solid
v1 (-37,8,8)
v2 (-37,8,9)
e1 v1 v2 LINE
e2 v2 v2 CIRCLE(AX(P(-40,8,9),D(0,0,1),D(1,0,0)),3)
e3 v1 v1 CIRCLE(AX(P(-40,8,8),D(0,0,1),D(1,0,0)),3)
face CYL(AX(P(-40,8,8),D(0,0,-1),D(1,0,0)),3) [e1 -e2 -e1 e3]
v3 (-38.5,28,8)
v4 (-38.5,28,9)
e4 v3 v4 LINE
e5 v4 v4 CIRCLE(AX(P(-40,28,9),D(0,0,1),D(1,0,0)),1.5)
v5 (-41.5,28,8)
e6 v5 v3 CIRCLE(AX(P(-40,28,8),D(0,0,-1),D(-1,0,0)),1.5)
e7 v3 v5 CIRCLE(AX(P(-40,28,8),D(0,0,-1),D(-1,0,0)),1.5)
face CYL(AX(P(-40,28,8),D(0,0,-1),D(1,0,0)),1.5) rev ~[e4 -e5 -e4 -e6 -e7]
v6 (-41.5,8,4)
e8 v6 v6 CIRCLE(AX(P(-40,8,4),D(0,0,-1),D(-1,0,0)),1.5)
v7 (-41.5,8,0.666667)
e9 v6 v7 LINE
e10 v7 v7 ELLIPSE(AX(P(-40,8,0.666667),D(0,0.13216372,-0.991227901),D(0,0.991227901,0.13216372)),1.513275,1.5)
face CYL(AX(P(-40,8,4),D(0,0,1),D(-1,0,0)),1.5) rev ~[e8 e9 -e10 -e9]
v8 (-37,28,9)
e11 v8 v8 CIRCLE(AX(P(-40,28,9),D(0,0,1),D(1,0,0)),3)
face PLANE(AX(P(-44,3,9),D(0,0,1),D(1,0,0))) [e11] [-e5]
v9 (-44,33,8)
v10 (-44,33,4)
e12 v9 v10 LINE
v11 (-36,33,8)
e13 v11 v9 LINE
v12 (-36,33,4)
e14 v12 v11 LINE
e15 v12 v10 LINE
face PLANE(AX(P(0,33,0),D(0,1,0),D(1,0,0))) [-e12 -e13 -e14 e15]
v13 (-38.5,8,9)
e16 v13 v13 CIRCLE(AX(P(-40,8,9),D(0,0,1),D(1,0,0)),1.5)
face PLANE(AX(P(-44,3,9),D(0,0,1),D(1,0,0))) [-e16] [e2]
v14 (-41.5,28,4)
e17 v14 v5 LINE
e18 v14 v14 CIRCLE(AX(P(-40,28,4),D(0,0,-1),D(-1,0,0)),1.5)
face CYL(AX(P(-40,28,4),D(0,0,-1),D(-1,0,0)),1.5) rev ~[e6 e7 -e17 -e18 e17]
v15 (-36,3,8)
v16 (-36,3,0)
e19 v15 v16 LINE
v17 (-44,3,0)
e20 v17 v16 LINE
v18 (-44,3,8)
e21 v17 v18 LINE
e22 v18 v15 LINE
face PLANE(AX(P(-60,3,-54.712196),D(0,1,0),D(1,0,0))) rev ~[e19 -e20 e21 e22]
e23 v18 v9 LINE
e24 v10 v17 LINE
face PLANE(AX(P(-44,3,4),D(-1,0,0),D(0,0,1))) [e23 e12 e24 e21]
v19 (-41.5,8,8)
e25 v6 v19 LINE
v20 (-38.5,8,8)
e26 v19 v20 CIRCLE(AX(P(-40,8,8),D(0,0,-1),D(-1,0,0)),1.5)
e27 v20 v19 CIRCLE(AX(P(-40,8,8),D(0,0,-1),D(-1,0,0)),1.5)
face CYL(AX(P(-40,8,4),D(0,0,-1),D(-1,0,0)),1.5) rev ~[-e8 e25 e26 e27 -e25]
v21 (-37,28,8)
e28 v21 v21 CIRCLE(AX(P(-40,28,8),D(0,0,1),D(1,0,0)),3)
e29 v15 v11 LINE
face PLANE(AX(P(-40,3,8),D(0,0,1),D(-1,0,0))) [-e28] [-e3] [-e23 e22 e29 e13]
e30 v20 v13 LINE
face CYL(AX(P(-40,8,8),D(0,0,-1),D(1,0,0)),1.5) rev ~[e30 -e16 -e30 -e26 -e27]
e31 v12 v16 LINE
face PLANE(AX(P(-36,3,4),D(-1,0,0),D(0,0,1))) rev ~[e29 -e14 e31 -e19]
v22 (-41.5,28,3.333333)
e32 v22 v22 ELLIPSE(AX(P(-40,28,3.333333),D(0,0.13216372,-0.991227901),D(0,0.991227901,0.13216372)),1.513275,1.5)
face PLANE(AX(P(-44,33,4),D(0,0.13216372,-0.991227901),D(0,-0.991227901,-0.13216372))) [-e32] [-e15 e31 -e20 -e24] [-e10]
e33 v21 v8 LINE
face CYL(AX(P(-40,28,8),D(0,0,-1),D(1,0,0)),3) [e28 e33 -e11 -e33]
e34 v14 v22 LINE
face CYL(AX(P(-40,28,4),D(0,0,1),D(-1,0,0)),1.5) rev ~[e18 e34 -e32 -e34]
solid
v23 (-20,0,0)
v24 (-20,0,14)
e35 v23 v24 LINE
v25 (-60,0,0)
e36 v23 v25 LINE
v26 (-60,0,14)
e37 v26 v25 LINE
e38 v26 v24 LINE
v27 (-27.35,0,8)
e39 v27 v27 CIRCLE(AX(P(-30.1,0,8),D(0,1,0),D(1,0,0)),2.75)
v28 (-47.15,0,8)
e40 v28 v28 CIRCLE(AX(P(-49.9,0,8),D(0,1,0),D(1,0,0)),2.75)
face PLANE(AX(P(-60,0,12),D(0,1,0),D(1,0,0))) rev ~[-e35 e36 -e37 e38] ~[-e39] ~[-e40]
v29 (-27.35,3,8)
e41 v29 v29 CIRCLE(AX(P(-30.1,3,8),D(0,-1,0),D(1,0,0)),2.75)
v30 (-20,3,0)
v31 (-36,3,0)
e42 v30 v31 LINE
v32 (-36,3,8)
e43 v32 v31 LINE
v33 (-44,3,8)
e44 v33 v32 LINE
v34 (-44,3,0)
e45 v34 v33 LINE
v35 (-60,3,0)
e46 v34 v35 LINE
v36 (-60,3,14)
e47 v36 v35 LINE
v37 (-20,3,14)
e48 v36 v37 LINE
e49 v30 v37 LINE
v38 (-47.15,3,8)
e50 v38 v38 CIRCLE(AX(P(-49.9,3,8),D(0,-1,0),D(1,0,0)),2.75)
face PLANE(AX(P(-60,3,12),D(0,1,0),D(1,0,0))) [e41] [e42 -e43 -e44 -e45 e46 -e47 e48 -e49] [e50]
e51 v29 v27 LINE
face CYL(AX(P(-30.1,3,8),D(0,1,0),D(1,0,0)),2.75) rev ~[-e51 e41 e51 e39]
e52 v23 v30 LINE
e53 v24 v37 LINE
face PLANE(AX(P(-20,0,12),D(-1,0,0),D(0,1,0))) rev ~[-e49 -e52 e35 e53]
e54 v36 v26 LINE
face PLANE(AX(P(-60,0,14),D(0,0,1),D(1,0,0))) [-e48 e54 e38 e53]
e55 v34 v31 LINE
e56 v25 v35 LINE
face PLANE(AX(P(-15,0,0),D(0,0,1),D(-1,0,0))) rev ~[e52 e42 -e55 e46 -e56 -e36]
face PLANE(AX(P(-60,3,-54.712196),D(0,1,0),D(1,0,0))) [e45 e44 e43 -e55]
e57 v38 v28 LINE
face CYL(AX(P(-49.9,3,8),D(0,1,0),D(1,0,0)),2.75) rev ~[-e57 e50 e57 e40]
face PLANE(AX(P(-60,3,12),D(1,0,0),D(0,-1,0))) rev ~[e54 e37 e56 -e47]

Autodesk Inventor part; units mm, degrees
ref_plane "YZ Plane" through (0, 0, 0) normal (1, 0, 0) x (0, 1, 0)
ref_plane "XZ Plane" through (0, 0, 0) normal (0, 1, 0) x (-1, 0, 0)
ref_plane "XY Plane" through (0, 0, 0) normal (0, 0, 1) x (1, 0, 0)
sketch "Sketch1" plane through (0, 0, 0) normal (0, 1, 0) x (-1, 0, 0)
  circle A0 centre (30.1, 6) radius 2.1
  circle A1 centre (49.9, 6) radius 2.1
  line L0 (0, 0) -> (80, 0)
  line L1 (80, 0) -> (80, 12)
  line L2 (0, 12) -> (80, 12)
  line L3 (0, 0) -> (0, 12)
  line L4 (40, 12) -> (15, 12)
  line L5 (15, 12) -> (15, 0)
  line L6 (15, 0) -> (65, 0)
  line L7 (65, 0) -> (65, 12)
  circle A2 centre (49.9, 6) radius 2.75
  circle A3 centre (30.1, 6) radius 2.75
  dimension "d0" = 25
  dimension "d1" = 50
  dimension "d2" = 5.5
  dimension "d3" = 5.5
extrude "Extrusion1" add sketch "Sketch1" along normal blind 3 contours L5 L2 L7 L0
sketch "Sketch6" plane through (0, 3, 0) normal (0, 1, 0) x (1, 0, 0)
  line L0 (-15, 0) -> (-65, 0) projected
  line L1 (-40, 0) -> (-43, 0)
  line L2 (-65, -12) -> (-15, -12) projected
  line L3 (-40, -12) -> (-40, -8)
  line L4 (-40, -8) -> (-43, -8)
  line L5 (-43, -8) -> (-43, -4)
  line L6 (-43, -4) -> (-37, -4)
  line L7 (-37, -4) -> (-37, -8)
  line L8 (-37, -8) -> (-40, -8)
  line L9 (-43, -8) -> (-44, -8)
  line L10 (-44, -8) -> (-44, -4)
  line L11 (-44, -4) -> (-43, -4)
  line L12 (-43, -4) -> (-43, -8)
  line L13 (-37, -4) -> (-36, -4)
  line L14 (-36, -4) -> (-36, -8)
  line L15 (-36, -8) -> (-37, -8)
  line L16 (-37, -8) -> (-37, -4)
  point P0 (0, 0)
  dimension "d22" = 3
  dimension "d23" = 4
  dimension "d24" = 4
  dimension "d25" = 6
  dimension "d28" = 1
  dimension "d29" = 1
extrude "Extrusion6" add sketch "Sketch6" along normal blind 30
sketch "Sketch8" plane through (-65, 0, 0) normal (-1, 0, 0) x (0, 0, 1)
  line L0 (0, 0) -> (12, 0) projected
  line L1 (12, 0) -> (12, 3) projected
  line L2 (0, 3) -> (12, 3) projected
  line L3 (0, 0) -> (0, 3) projected
extrude "Extrusion8" cut sketch "Sketch8" against normal blind 5
sketch "Sketch9" plane through (-15, 0, 12) normal (1, 0, 0) x (0, 0, -1)
  line L0 (0, 0) -> (12, 0) projected
  line L1 (12, 0) -> (12, 3) projected
  line L2 (0, 3) -> (12, 3) projected
  line L3 (0, 0) -> (0, 3) projected
extrude "Extrusion9" cut sketch "Sketch9" against normal blind 5
sketch "Sketch10" plane through (-44, 3, 4) normal (-1, 0, 0) x (0, 0, 1)
  line L0 (-4, -3) -> (-4, 0) projected
  line L1 (-4, 0) -> (0, 0)
  line L2 (-0.75, 0) -> (4.75, 0) projected
  line L3 (0, 30) -> (-4, 0)
  line L4 (0, 30) -> (4, 30) projected
  line L5 (4, 0) -> (4, 30) projected
  dimension "d41" = 4
extrude "Extrusion10" add sketch "Sketch10" against normal blind 8
sketch "Sketch7" plane through (-36, 3, 4) normal (0, 0, -1) x (-1, 0, 0)
  line L0 (8, 0) -> (8, 30) projected
  line L1 (8, 15) -> (8, 5)
  line L2 (8, 5) -> (8, 25)
  line L3 (8, 25) -> (4, 25)
  line L4 (0, 0) -> (0, 30) projected
  line L5 (8, 5) -> (4, 5)
  circle A0 centre (4, 25) radius 1.5
  circle A1 centre (4, 5) radius 1.5
  point P0 (-36, -3)
  dimension "d30" = 10
  dimension "d31" = 20
  dimension "d32" = 4
  dimension "d33" = 3
  dimension "d34" = 3
extrude "Extrusion7" cut sketch "Sketch7" along normal mid plane 30
sketch "Sketch11" plane through (-44, 3, 8) normal (0, 0, 1) x (1, 0, 0)
  circle A0 centre (4, 25) radius 1.5 projected
  circle A1 centre (4, 5) radius 1.5 projected
  circle A2 centre (4, 25) radius 3
  circle A3 centre (4, 5) radius 3
  point P0 (44, -3)
  dimension "d44" = 6
  dimension "d45" = 6
extrude "Extrusion11" add sketch "Sketch11" along normal blind 1
sketch "Sketch12" plane through (-60, 0, 12) normal (0, 0, 1) x (1, 0, 0)
  line L0 (40, 0) -> (40, 3) projected
  line L1 (0, 3) -> (40, 3) projected
  line L2 (0, 3) -> (0, 0) projected
  line L3 (0, 0) -> (40, 0) projected
  point P0 (60, 0)
extrude "Extrusion12" add sketch "Sketch12" along normal blind 2
sketch "Sketch13" plane through (0, 3, 0) normal (0, 1, 0) x (1, 0, 0)
  circle A0 centre (-30.1, -6) radius 2.75 projected
  circle A1 centre (-49.9, -6) radius 2.75 projected
  line L0 (-36, 0) -> (-36, -8) projected
  line L1 (-36, -8) -> (-44, -8) projected
  line L2 (-44, -8) -> (-44, 0) projected
  line L3 (-44, 0) -> (-60, 0) projected
  line L4 (-60, 0) -> (-60, -14) projected
  line L5 (-20, -14) -> (-60, -14) projected
  line L6 (-20, -14) -> (-20, 0) projected
  line L7 (-20, 0) -> (-36, 0) projected
  line L8 (-30.1, -6) -> (-30.1, -8)
  line L9 (-49.9, -6) -> (-49.9, -8)
  circle A2 centre (-49.9, -8) radius 2.75
  circle A3 centre (-30.1, -8) radius 2.75
  point P0 (0, 0)
sketch "Sketch14" plane through (0, 3, 0) normal (0, 1, 0) x (1, 0, 0)
  circle A0 centre (-49.9, -6) radius 2.75 projected
  circle A1 centre (-30.1, -6) radius 2.75 projected
  point P0 (0, 0)
extrude "Extrusion14" add sketch "Sketch13" against normal up to surface (3 mm away) contours A0 A3 | A3 A0 | A1 A2 | A2 A1 picked at (-29.7315, -4.622) picked at (-30.3176, -7.5571) picked at (-49.5315, -4.622) picked at (-50.1176, -6.4429)
sketch "Sketch15" plane through (0, 3, 0) normal (0, 1, 0) x (1, 0, 0)
  circle A0 centre (-30.1, -6) radius 2.75 projected
  circle A1 centre (-49.9, -6) radius 2.75 projected
  line L0 (-30.1, -6) -> (-30.1, -8)
  line L1 (-49.9, -6) -> (-49.9, -8)
  circle A2 centre (-49.9, -8) radius 2.75
  circle A3 centre (-30.1, -8) radius 2.75
  point P0 (0, 0)
  dimension "d54" = 2
extrude "Extrusion15" cut sketch "Sketch15" against normal through all contours A3 A0 | A0 A3 | A2 A1 | A1 A2 picked at (-30.3176, -7.5571) picked at (-29.7315, -9.378) picked at (-50.1176, -6.4429) picked at (-49.5315, -9.378)
sketch "Sketch16" plane through (-60, 0, 14) normal (0, 0, 1) x (1, 0, 0)
  line L0 (40, 3) -> (0, 3) projected
  line L1 (0, 0) -> (0, 3) projected
  line L2 (0, 3) -> (20, 59.8122)
  line L3 (40, 3) -> (24, 3) projected
  line L4 (20, 59.8122) -> (40, 3)
  line L5 (0, 3) -> (40, 3)
  line L6 (24, 3) -> (16, 3) projected
  point P0 (60, 0)
split body "Split1" sketch "Sketch16" result two bodies curves L2 L4 L5 first body at (-43.1895, 0.5, 1.7567)
sketch "Sketch17" plane through (-44, 33, 8) normal (0, 0, 1) x (1, 0, 0)
  circle A0 centre (4, -25) radius 3 projected
  circle A1 centre (4, -5) radius 3 projected
  line L0 (8, -30) -> (0, -30) projected
  line L1 (8, -30) -> (8, 0) projected
  line L2 (0, 0) -> (8, 0) projected
  line L3 (0, -30) -> (0, 0) projected
  circle A2 centre (4, -25) radius 3 projected
  circle A3 centre (4, -25) radius 1.5 projected
  circle A4 centre (4, -5) radius 1.5 projected
  circle A5 centre (4, -5) radius 3 projected
  circle A6 centre (4, -5) radius 1.5 projected
  point P0 (44, -33)
properties part number "limit_switch_horizontal"
